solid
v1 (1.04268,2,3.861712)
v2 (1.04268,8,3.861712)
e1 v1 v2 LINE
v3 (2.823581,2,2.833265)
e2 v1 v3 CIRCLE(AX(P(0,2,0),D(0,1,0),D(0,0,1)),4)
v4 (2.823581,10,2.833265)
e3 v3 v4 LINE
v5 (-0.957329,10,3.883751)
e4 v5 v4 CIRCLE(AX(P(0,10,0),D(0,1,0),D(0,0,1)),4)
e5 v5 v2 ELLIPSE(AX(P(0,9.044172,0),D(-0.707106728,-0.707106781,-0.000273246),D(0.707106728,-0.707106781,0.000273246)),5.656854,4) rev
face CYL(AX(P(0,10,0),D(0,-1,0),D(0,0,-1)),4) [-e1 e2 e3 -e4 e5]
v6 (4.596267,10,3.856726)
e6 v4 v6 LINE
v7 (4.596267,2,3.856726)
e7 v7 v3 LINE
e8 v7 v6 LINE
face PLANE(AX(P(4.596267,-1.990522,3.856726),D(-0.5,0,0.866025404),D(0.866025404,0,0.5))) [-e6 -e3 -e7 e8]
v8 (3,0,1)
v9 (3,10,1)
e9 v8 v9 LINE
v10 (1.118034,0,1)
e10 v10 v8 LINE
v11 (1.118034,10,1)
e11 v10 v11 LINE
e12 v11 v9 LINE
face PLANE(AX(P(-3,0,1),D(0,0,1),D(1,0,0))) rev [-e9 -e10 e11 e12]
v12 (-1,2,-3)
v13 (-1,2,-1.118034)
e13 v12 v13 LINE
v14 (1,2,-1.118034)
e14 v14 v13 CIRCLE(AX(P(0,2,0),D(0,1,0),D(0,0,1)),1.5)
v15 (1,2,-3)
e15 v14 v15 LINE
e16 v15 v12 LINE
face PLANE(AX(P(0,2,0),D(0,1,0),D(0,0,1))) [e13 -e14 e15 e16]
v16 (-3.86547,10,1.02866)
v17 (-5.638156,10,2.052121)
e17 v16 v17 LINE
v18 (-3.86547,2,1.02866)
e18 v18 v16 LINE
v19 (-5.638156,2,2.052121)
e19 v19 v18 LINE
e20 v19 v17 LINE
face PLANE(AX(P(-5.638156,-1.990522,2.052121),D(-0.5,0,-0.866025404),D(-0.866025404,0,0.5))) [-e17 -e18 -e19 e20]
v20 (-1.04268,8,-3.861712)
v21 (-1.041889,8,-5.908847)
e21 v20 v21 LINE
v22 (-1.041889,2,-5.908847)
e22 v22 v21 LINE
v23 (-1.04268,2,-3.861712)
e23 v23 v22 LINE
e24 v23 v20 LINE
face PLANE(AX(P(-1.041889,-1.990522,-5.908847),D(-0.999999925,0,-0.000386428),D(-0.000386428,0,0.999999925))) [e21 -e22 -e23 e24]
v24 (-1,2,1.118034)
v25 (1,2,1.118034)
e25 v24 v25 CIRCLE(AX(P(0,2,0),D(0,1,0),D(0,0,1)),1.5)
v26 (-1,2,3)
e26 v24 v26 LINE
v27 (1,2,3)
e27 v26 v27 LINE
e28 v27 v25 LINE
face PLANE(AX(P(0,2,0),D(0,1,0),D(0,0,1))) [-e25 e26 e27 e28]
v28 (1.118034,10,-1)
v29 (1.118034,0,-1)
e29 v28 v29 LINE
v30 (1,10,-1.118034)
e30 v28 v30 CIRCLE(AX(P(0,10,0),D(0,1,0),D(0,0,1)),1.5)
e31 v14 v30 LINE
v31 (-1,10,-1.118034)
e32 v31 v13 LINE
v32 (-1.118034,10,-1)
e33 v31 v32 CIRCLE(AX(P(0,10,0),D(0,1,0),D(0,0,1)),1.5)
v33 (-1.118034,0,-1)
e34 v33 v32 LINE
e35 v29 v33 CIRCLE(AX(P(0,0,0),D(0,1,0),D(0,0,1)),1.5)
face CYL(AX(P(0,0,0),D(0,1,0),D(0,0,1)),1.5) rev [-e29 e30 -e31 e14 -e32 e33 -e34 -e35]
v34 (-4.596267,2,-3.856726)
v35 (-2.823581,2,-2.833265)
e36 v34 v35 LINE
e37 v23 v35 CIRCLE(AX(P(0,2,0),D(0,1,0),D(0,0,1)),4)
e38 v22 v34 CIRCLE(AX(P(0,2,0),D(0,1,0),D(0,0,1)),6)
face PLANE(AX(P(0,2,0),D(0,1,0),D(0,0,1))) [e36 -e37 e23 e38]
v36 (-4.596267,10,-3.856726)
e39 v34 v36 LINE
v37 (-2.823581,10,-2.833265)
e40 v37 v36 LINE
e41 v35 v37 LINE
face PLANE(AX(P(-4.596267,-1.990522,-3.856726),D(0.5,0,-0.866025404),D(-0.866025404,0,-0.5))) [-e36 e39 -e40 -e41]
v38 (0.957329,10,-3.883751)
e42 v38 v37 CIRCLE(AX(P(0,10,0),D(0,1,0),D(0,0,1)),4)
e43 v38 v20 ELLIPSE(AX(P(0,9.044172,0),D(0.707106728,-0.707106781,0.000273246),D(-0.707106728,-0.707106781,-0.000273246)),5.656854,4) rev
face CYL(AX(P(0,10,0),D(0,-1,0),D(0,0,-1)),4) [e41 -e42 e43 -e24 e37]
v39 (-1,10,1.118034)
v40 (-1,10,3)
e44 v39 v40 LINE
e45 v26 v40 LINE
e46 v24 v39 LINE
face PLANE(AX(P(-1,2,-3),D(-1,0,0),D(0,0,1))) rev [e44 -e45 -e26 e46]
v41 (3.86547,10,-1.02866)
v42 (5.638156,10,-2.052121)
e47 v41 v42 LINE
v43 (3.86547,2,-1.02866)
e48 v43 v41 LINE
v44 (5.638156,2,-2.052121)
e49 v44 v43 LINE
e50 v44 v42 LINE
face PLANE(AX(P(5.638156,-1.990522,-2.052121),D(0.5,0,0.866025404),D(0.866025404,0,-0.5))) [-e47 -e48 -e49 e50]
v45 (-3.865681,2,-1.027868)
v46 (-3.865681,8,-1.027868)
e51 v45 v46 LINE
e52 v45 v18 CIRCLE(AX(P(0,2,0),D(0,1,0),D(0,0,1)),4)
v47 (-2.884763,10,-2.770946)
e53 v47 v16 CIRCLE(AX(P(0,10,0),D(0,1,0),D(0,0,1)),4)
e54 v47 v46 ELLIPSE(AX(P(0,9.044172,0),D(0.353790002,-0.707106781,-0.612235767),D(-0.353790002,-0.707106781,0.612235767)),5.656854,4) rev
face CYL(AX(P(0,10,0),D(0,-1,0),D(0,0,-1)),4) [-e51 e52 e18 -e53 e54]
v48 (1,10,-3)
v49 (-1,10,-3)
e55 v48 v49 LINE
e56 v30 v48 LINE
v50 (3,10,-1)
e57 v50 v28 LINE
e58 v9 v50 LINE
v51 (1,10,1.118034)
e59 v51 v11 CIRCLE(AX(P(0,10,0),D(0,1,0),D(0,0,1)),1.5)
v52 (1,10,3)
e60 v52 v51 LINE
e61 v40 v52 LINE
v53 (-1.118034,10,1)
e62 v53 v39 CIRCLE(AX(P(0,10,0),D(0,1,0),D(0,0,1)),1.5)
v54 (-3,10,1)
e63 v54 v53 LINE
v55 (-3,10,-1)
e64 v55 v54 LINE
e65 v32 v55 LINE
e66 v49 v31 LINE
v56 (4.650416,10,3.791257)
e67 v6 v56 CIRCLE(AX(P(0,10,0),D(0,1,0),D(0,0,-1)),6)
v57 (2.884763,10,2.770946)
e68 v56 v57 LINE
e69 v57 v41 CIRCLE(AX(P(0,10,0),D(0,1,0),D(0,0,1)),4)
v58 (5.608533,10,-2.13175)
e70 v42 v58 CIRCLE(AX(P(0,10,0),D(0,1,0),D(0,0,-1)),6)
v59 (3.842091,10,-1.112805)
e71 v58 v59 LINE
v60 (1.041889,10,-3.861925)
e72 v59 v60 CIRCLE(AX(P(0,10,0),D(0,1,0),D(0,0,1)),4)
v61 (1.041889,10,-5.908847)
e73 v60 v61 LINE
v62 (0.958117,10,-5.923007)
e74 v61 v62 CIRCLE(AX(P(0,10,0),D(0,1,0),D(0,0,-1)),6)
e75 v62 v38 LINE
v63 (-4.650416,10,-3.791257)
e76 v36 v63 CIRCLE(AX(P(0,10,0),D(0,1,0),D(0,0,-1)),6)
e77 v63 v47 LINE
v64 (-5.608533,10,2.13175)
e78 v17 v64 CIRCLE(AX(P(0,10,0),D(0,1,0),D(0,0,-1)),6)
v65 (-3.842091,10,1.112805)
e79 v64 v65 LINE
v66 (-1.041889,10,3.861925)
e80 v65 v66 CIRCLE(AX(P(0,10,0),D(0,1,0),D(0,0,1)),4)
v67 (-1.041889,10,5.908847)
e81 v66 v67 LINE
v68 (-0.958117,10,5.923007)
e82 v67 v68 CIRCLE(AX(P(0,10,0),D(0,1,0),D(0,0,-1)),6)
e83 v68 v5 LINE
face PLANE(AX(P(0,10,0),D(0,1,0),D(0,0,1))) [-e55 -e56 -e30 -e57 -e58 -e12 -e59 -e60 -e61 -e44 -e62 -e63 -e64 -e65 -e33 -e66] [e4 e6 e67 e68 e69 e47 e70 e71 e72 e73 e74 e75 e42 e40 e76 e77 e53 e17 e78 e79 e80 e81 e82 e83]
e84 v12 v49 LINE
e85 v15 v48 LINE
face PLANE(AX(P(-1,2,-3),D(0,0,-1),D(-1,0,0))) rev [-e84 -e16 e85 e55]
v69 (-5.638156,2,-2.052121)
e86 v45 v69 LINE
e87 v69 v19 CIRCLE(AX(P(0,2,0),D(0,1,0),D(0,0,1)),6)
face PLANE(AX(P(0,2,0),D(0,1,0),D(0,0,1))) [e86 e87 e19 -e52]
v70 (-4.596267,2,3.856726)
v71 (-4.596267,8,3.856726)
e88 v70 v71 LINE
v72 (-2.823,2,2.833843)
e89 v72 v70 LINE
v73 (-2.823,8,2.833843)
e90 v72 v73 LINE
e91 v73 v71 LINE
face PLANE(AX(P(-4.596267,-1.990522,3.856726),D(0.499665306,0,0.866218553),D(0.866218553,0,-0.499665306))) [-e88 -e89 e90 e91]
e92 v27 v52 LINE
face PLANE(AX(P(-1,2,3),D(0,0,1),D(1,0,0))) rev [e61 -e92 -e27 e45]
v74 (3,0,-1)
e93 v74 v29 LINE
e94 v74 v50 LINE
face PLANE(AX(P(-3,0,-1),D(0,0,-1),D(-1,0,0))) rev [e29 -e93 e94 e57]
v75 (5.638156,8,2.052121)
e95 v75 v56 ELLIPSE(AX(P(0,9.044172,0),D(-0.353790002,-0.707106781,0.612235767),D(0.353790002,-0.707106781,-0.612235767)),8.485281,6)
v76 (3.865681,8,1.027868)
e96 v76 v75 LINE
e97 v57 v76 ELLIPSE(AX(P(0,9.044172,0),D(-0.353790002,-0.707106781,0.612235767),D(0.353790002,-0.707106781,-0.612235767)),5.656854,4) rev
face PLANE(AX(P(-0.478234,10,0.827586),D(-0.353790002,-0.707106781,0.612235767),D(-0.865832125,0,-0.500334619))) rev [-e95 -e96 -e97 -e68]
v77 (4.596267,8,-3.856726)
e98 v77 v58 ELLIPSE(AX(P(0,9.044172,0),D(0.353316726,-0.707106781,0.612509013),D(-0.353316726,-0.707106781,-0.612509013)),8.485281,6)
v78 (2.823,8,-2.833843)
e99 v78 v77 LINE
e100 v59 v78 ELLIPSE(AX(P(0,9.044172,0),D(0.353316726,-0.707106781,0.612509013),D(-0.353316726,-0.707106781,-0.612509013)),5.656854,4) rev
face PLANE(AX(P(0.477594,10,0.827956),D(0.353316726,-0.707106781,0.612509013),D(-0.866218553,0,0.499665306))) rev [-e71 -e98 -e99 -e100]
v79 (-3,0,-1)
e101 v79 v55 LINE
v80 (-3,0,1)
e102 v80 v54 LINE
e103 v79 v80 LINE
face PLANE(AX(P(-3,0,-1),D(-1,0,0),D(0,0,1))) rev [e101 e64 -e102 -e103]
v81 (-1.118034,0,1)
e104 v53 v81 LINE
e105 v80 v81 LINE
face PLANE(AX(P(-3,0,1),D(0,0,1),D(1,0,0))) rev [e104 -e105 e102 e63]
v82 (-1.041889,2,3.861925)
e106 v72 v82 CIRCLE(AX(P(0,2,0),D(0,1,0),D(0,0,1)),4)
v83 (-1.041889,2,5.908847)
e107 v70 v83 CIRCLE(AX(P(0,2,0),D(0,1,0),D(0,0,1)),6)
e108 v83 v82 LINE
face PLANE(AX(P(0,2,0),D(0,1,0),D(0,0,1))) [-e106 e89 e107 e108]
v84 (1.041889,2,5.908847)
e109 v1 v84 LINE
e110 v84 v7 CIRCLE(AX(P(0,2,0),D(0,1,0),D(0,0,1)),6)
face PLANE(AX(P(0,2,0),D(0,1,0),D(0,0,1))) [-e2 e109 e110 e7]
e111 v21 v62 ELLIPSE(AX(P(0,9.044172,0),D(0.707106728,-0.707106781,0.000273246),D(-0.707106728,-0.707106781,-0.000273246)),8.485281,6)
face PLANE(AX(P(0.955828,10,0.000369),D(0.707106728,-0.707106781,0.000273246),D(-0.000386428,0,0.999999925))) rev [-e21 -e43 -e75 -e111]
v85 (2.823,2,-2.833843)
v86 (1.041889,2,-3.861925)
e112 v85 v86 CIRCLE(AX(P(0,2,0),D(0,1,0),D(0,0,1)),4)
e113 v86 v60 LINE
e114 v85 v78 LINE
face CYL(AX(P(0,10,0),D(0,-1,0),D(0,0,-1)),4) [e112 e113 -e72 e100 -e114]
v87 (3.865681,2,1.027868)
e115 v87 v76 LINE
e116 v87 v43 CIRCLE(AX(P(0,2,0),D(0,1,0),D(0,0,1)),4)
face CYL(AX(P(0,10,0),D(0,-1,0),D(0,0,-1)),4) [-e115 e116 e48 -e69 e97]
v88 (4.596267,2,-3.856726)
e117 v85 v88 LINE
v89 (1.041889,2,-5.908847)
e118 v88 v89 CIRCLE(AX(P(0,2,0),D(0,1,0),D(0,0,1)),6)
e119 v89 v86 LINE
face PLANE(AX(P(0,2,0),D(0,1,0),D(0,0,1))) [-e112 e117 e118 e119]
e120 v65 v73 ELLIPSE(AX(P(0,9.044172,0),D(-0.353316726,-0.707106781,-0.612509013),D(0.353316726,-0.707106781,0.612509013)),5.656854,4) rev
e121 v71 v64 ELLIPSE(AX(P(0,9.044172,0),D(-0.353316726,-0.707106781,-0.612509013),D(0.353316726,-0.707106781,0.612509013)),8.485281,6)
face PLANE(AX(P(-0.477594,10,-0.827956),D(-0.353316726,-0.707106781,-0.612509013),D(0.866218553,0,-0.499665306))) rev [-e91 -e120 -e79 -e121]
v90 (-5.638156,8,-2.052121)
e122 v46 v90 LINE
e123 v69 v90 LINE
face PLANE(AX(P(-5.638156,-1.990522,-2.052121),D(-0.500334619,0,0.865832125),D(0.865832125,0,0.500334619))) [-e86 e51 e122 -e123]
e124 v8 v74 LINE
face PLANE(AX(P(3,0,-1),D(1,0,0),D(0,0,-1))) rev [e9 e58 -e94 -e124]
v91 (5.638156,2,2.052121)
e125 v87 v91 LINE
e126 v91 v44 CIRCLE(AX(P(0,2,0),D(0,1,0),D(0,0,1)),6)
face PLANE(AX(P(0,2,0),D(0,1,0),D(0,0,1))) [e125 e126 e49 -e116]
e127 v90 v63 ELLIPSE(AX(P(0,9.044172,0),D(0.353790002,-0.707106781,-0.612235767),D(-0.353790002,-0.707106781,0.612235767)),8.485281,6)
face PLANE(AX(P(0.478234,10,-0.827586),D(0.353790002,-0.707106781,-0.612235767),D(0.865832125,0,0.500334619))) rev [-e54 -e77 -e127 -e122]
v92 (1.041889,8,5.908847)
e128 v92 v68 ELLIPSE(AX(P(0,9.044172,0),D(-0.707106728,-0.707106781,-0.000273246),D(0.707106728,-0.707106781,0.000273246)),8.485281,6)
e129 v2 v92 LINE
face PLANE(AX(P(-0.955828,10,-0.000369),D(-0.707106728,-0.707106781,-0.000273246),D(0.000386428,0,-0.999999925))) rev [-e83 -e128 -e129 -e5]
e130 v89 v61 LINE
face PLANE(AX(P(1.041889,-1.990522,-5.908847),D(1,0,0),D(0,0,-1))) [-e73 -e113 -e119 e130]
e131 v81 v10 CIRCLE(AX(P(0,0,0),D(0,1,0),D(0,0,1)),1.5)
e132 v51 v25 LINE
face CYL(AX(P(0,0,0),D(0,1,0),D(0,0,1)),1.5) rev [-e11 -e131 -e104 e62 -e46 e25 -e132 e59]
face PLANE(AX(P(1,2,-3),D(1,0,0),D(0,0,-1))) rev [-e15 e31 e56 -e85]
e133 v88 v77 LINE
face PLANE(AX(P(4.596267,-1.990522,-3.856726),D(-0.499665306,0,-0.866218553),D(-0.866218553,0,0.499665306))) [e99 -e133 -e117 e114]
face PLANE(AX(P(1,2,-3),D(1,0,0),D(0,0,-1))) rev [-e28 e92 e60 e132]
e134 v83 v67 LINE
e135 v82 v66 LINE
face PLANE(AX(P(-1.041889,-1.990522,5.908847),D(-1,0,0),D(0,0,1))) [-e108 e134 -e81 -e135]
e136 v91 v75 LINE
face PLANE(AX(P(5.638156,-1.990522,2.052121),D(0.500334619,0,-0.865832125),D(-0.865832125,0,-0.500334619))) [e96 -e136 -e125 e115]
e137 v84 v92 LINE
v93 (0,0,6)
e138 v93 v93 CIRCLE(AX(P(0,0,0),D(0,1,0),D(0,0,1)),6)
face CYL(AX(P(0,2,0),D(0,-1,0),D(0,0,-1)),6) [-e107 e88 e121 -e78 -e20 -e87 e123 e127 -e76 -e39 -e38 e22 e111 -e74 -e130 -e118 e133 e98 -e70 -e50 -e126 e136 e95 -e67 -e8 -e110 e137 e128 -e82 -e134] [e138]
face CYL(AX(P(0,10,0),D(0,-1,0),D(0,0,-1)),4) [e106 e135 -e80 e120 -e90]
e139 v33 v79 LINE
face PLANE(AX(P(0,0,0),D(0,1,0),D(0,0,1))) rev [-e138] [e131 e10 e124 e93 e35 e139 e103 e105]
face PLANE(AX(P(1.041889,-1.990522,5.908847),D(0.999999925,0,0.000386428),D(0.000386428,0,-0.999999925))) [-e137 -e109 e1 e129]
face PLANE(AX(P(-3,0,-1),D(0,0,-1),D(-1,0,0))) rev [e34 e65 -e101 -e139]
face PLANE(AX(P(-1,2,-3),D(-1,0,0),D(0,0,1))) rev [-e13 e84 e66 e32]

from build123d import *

# Parameters (mm, degrees)
SKETCH1_R           = 6
BOSS_EXTRUDE1_DEPTH = 2
SKETCH2_R           = 4
BOSS_EXTRUDE2_DEPTH = 8
SKETCH3_W           = 6
SKETCH3_H           = 2
CUT_EXTRUDE1_DEPTH  = 14.114877049
SKETCH4_W           = 2
SKETCH4_H           = 6
CUT_EXTRUDE2_DEPTH  = 8
SKETCH10_R          = 1.5
CUT_EXTRUDE3_DEPTH  = 14.114877049
BOSS_EXTRUDE3_START = -8
BOSS_EXTRUDE3_DEPTH = 8
CHAMFER3_SIZE       = 2


with BuildPart() as part:
    # Sketch1 → Boss-Extrude1 (new body)
    with BuildSketch(Plane(origin=(0, 0, 0), x_dir=(1, 0, 0), z_dir=(0, 1, 0))):
        with Locations(Location((0, 0, 0), (0, 0, 270))):
            Circle(SKETCH1_R)
    extrude(amount=BOSS_EXTRUDE1_DEPTH)

    # Sketch2 → Boss-Extrude2 (add)
    with BuildSketch(Plane(origin=(0, 2, 0), x_dir=(1, 0, 0), z_dir=(0, 1, 0))):
        with Locations(Location((0, 0, 0), (0, 0, 270))):
            Circle(SKETCH2_R)
    extrude(amount=BOSS_EXTRUDE2_DEPTH)

    # Sketch3 → Cut-Extrude1 (cut, through all)
    with BuildSketch(Plane(origin=(0, 10, 0), x_dir=(1, 0, 0), z_dir=(0, 1, 0))):
        Rectangle(SKETCH3_W, SKETCH3_H)
    extrude(amount=-CUT_EXTRUDE1_DEPTH, mode=Mode.SUBTRACT)

    # Sketch4 → Cut-Extrude2 (cut)
    with BuildSketch(Plane(origin=(0, 10, 0), x_dir=(1, 0, 0), z_dir=(0, 1, 0))):
        Rectangle(SKETCH4_W, SKETCH4_H)
    extrude(amount=-CUT_EXTRUDE2_DEPTH, mode=Mode.SUBTRACT)

    # Sketch10 → Cut-Extrude3 (cut, through all)
    with BuildSketch(Plane(origin=(0, 10, 0), x_dir=(1, 0, 0), z_dir=(0, 1, 0))):
        Circle(SKETCH10_R)
    extrude(amount=-CUT_EXTRUDE3_DEPTH, mode=Mode.SUBTRACT)

    # Sketch11 → Boss-Extrude3 (add)
    with BuildSketch(Plane(origin=(0, 10, 0), x_dir=(1, 0, 0), z_dir=(0, 1, 0)).offset(BOSS_EXTRUDE3_START)):
        with BuildLine():
            Line((-1.041889066, 5.908846518), (-1.042680136, 3.861711814))
            Line((-1.042680136, 3.861711814), (1.041889066, 3.86192532))
            Line((1.041889066, 3.86192532), (1.041889066, 5.908846518))
            ThreePointArc((1.041889066, 5.908846518), (0, 6), (-1.041889066, 5.908846518))
        make_face()
        with BuildLine():
            Line((4.596266659, 3.856725658), (2.823000465, 2.833843393))
            Line((2.823000465, 2.833843393), (3.865469967, 1.028660261))
            Line((3.865469967, 1.028660261), (5.638155725, 2.05212086))
            ThreePointArc((5.638155725, 2.05212086), (5.196152423, 3), (4.596266659, 3.856725658))
        make_face()
        with BuildLine():
            Line((5.638155725, -2.05212086), (3.865680601, -1.027868421))
            Line((3.865680601, -1.027868421), (2.823580901, -2.833265059))
            Line((2.823580901, -2.833265059), (4.596266659, -3.856725658))
            ThreePointArc((4.596266659, -3.856725658), (5.196152423, -3), (5.638155725, -2.05212086))
        make_face()
        with BuildLine():
            Line((1.041889066, -5.908846518), (1.042680136, -3.861711814))
            Line((1.042680136, -3.861711814), (-1.041889066, -3.86192532))
            Line((-1.041889066, -3.86192532), (-1.041889066, -5.908846518))
            ThreePointArc((-1.041889066, -5.908846518), (0, -6), (1.041889066, -5.908846518))
        make_face()
        with BuildLine():
            Line((-4.596266659, -3.856725658), (-2.823000465, -2.833843393))
            Line((-2.823000465, -2.833843393), (-3.865469967, -1.028660261))
            Line((-3.865469967, -1.028660261), (-5.638155725, -2.05212086))
            ThreePointArc((-5.638155725, -2.05212086), (-5.196152423, -3), (-4.596266659, -3.856725658))
        make_face()
        with BuildLine():
            Line((-5.638155725, 2.05212086), (-3.865680601, 1.027868421))
            Line((-3.865680601, 1.027868421), (-2.823580901, 2.833265059))
            Line((-2.823580901, 2.833265059), (-4.596266659, 3.856725658))
            ThreePointArc((-4.596266659, 3.856725658), (-5.196152423, 3), (-5.638155725, 2.05212086))
        make_face()
    extrude(amount=BOSS_EXTRUDE3_DEPTH)

    # Chamfer3
    # the kernel refuses this chamfer: 2 mm, written as the material it takes off along each edge
    with BuildSketch(Plane(origin=(9.051545693, 10, -6.426687193), x_dir=(0.49947639120581244, 0.02749587661058648, 0.865891050535478), z_dir=(-0.8662185531215343, 0, 0.49966530620810146))) as chamfer3_piece_1_section:
        Polygon((CHAMFER3_SIZE * 0.999621916911, -CHAMFER3_SIZE * 0.0274958766106), (-CHAMFER3_SIZE * 0.0274958766106, -CHAMFER3_SIZE * 0.999621916911), (0, 0), align=None)
    chamfer3_piece_1 = extrude(amount=12.333866809, mode=Mode.PRIVATE)
    chamfer3_piece_1 = chamfer3_piece_1 - Plane(origin=(0, 9.335728608, 0), x_dir=(0, 0, 1), z_dir=(0, -1, 0)) * Cylinder(4, 33, mode=Mode.PRIVATE)
    add(chamfer3_piece_1, mode=Mode.SUBTRACT)
    with BuildSketch(Plane(origin=(10.091447218, 10, 4.625524917), x_dir=(-0.5001454510704151, 0.027495876610586487, 0.8655047686425457), z_dir=(-0.8658321251267121, 0, -0.5003346191286003))) as chamfer3_piece_2_section:
        Polygon((CHAMFER3_SIZE * 0.999621916911, -CHAMFER3_SIZE * 0.0274958766106), (-CHAMFER3_SIZE * 0.0274958766106, -CHAMFER3_SIZE * 0.999621916911), (0, 0), align=None)
    chamfer3_piece_2 = extrude(amount=12.333866809, mode=Mode.PRIVATE)
    chamfer3_piece_2 = chamfer3_piece_2 - Plane(origin=(0, 9.332082239, 0), x_dir=(0, 0, 1), z_dir=(0, -1, 0)) * Cylinder(4, 33, mode=Mode.PRIVATE)
    add(chamfer3_piece_2, mode=Mode.SUBTRACT)
    with BuildSketch(Plane(origin=(1.039901525, 10, 11.05221211), x_dir=(0.027495874557653455, -0.9996219169112968, 1.0625176464596534e-05), z_dir=(0.0003864279948254377, 0, -0.9999999253366997))) as chamfer3_piece_3_section:
        Polygon((CHAMFER3_SIZE * 0.999621916911, CHAMFER3_SIZE * 0.0274958766106), (-CHAMFER3_SIZE * 0.0274958766106, CHAMFER3_SIZE * 0.999621916911), (0, 0), align=None)
    chamfer3_piece_3 = extrude(amount=12.333866809, mode=Mode.PRIVATE)
    chamfer3_piece_3 = chamfer3_piece_3 - Plane(origin=(0, 9.010529582, 0), x_dir=(0, 0, 1), z_dir=(0, -1, 0)) * Cylinder(4, 33, mode=Mode.PRIVATE)
    add(chamfer3_piece_3, mode=Mode.SUBTRACT)
    with BuildSketch(Plane(origin=(-9.051545693, 10, 6.426687193), x_dir=(-0.4994763912058064, 0.02749587661058648, -0.8658910505354813), z_dir=(0.8662185531215377, 0, -0.4996653062080955))) as chamfer3_piece_4_section:
        Polygon((CHAMFER3_SIZE * 0.999621916911, -CHAMFER3_SIZE * 0.0274958766106), (-CHAMFER3_SIZE * 0.0274958766106, -CHAMFER3_SIZE * 0.999621916911), (0, 0), align=None)
    chamfer3_piece_4 = extrude(amount=12.333866809, mode=Mode.PRIVATE)
    chamfer3_piece_4 = chamfer3_piece_4 - Plane(origin=(0, 9.335728608, 0), x_dir=(0, 0, 1), z_dir=(0, -1, 0)) * Cylinder(4, 33, mode=Mode.PRIVATE)
    add(chamfer3_piece_4, mode=Mode.SUBTRACT)
    with BuildSketch(Plane(origin=(-10.091447218, 10, -4.625524917), x_dir=(0.5001454510704163, 0.02749587661058648, -0.8655047686425448), z_dir=(0.8658321251267114, 0, 0.5003346191286018))) as chamfer3_piece_5_section:
        Polygon((CHAMFER3_SIZE * 0.999621916911, -CHAMFER3_SIZE * 0.0274958766106), (-CHAMFER3_SIZE * 0.0274958766106, -CHAMFER3_SIZE * 0.999621916911), (0, 0), align=None)
    chamfer3_piece_5 = extrude(amount=12.333866809, mode=Mode.PRIVATE)
    chamfer3_piece_5 = chamfer3_piece_5 - Plane(origin=(0, 9.332082239, 0), x_dir=(0, 0, 1), z_dir=(0, -1, 0)) * Cylinder(4, 33, mode=Mode.PRIVATE)
    add(chamfer3_piece_5, mode=Mode.SUBTRACT)
    with BuildSketch(Plane(origin=(-1.039901525, 10, -11.05221211), x_dir=(0.9996218422762253, 0.027495876610586487, 0.00038628189292865347), z_dir=(-0.00038642799481849587, 0, 0.9999999253366997))) as chamfer3_piece_6_section:
        Polygon((CHAMFER3_SIZE * 0.999621916911, -CHAMFER3_SIZE * 0.0274958766106), (-CHAMFER3_SIZE * 0.0274958766106, -CHAMFER3_SIZE * 0.999621916911), (0, 0), align=None)
    chamfer3_piece_6 = extrude(amount=12.333866809, mode=Mode.PRIVATE)
    chamfer3_piece_6 = chamfer3_piece_6 - Plane(origin=(0, 9.346435038, 0), x_dir=(0, 0, 1), z_dir=(0, -1, 0)) * Cylinder(4, 33, mode=Mode.PRIVATE)
    add(chamfer3_piece_6, mode=Mode.SUBTRACT)


solid = part.part
